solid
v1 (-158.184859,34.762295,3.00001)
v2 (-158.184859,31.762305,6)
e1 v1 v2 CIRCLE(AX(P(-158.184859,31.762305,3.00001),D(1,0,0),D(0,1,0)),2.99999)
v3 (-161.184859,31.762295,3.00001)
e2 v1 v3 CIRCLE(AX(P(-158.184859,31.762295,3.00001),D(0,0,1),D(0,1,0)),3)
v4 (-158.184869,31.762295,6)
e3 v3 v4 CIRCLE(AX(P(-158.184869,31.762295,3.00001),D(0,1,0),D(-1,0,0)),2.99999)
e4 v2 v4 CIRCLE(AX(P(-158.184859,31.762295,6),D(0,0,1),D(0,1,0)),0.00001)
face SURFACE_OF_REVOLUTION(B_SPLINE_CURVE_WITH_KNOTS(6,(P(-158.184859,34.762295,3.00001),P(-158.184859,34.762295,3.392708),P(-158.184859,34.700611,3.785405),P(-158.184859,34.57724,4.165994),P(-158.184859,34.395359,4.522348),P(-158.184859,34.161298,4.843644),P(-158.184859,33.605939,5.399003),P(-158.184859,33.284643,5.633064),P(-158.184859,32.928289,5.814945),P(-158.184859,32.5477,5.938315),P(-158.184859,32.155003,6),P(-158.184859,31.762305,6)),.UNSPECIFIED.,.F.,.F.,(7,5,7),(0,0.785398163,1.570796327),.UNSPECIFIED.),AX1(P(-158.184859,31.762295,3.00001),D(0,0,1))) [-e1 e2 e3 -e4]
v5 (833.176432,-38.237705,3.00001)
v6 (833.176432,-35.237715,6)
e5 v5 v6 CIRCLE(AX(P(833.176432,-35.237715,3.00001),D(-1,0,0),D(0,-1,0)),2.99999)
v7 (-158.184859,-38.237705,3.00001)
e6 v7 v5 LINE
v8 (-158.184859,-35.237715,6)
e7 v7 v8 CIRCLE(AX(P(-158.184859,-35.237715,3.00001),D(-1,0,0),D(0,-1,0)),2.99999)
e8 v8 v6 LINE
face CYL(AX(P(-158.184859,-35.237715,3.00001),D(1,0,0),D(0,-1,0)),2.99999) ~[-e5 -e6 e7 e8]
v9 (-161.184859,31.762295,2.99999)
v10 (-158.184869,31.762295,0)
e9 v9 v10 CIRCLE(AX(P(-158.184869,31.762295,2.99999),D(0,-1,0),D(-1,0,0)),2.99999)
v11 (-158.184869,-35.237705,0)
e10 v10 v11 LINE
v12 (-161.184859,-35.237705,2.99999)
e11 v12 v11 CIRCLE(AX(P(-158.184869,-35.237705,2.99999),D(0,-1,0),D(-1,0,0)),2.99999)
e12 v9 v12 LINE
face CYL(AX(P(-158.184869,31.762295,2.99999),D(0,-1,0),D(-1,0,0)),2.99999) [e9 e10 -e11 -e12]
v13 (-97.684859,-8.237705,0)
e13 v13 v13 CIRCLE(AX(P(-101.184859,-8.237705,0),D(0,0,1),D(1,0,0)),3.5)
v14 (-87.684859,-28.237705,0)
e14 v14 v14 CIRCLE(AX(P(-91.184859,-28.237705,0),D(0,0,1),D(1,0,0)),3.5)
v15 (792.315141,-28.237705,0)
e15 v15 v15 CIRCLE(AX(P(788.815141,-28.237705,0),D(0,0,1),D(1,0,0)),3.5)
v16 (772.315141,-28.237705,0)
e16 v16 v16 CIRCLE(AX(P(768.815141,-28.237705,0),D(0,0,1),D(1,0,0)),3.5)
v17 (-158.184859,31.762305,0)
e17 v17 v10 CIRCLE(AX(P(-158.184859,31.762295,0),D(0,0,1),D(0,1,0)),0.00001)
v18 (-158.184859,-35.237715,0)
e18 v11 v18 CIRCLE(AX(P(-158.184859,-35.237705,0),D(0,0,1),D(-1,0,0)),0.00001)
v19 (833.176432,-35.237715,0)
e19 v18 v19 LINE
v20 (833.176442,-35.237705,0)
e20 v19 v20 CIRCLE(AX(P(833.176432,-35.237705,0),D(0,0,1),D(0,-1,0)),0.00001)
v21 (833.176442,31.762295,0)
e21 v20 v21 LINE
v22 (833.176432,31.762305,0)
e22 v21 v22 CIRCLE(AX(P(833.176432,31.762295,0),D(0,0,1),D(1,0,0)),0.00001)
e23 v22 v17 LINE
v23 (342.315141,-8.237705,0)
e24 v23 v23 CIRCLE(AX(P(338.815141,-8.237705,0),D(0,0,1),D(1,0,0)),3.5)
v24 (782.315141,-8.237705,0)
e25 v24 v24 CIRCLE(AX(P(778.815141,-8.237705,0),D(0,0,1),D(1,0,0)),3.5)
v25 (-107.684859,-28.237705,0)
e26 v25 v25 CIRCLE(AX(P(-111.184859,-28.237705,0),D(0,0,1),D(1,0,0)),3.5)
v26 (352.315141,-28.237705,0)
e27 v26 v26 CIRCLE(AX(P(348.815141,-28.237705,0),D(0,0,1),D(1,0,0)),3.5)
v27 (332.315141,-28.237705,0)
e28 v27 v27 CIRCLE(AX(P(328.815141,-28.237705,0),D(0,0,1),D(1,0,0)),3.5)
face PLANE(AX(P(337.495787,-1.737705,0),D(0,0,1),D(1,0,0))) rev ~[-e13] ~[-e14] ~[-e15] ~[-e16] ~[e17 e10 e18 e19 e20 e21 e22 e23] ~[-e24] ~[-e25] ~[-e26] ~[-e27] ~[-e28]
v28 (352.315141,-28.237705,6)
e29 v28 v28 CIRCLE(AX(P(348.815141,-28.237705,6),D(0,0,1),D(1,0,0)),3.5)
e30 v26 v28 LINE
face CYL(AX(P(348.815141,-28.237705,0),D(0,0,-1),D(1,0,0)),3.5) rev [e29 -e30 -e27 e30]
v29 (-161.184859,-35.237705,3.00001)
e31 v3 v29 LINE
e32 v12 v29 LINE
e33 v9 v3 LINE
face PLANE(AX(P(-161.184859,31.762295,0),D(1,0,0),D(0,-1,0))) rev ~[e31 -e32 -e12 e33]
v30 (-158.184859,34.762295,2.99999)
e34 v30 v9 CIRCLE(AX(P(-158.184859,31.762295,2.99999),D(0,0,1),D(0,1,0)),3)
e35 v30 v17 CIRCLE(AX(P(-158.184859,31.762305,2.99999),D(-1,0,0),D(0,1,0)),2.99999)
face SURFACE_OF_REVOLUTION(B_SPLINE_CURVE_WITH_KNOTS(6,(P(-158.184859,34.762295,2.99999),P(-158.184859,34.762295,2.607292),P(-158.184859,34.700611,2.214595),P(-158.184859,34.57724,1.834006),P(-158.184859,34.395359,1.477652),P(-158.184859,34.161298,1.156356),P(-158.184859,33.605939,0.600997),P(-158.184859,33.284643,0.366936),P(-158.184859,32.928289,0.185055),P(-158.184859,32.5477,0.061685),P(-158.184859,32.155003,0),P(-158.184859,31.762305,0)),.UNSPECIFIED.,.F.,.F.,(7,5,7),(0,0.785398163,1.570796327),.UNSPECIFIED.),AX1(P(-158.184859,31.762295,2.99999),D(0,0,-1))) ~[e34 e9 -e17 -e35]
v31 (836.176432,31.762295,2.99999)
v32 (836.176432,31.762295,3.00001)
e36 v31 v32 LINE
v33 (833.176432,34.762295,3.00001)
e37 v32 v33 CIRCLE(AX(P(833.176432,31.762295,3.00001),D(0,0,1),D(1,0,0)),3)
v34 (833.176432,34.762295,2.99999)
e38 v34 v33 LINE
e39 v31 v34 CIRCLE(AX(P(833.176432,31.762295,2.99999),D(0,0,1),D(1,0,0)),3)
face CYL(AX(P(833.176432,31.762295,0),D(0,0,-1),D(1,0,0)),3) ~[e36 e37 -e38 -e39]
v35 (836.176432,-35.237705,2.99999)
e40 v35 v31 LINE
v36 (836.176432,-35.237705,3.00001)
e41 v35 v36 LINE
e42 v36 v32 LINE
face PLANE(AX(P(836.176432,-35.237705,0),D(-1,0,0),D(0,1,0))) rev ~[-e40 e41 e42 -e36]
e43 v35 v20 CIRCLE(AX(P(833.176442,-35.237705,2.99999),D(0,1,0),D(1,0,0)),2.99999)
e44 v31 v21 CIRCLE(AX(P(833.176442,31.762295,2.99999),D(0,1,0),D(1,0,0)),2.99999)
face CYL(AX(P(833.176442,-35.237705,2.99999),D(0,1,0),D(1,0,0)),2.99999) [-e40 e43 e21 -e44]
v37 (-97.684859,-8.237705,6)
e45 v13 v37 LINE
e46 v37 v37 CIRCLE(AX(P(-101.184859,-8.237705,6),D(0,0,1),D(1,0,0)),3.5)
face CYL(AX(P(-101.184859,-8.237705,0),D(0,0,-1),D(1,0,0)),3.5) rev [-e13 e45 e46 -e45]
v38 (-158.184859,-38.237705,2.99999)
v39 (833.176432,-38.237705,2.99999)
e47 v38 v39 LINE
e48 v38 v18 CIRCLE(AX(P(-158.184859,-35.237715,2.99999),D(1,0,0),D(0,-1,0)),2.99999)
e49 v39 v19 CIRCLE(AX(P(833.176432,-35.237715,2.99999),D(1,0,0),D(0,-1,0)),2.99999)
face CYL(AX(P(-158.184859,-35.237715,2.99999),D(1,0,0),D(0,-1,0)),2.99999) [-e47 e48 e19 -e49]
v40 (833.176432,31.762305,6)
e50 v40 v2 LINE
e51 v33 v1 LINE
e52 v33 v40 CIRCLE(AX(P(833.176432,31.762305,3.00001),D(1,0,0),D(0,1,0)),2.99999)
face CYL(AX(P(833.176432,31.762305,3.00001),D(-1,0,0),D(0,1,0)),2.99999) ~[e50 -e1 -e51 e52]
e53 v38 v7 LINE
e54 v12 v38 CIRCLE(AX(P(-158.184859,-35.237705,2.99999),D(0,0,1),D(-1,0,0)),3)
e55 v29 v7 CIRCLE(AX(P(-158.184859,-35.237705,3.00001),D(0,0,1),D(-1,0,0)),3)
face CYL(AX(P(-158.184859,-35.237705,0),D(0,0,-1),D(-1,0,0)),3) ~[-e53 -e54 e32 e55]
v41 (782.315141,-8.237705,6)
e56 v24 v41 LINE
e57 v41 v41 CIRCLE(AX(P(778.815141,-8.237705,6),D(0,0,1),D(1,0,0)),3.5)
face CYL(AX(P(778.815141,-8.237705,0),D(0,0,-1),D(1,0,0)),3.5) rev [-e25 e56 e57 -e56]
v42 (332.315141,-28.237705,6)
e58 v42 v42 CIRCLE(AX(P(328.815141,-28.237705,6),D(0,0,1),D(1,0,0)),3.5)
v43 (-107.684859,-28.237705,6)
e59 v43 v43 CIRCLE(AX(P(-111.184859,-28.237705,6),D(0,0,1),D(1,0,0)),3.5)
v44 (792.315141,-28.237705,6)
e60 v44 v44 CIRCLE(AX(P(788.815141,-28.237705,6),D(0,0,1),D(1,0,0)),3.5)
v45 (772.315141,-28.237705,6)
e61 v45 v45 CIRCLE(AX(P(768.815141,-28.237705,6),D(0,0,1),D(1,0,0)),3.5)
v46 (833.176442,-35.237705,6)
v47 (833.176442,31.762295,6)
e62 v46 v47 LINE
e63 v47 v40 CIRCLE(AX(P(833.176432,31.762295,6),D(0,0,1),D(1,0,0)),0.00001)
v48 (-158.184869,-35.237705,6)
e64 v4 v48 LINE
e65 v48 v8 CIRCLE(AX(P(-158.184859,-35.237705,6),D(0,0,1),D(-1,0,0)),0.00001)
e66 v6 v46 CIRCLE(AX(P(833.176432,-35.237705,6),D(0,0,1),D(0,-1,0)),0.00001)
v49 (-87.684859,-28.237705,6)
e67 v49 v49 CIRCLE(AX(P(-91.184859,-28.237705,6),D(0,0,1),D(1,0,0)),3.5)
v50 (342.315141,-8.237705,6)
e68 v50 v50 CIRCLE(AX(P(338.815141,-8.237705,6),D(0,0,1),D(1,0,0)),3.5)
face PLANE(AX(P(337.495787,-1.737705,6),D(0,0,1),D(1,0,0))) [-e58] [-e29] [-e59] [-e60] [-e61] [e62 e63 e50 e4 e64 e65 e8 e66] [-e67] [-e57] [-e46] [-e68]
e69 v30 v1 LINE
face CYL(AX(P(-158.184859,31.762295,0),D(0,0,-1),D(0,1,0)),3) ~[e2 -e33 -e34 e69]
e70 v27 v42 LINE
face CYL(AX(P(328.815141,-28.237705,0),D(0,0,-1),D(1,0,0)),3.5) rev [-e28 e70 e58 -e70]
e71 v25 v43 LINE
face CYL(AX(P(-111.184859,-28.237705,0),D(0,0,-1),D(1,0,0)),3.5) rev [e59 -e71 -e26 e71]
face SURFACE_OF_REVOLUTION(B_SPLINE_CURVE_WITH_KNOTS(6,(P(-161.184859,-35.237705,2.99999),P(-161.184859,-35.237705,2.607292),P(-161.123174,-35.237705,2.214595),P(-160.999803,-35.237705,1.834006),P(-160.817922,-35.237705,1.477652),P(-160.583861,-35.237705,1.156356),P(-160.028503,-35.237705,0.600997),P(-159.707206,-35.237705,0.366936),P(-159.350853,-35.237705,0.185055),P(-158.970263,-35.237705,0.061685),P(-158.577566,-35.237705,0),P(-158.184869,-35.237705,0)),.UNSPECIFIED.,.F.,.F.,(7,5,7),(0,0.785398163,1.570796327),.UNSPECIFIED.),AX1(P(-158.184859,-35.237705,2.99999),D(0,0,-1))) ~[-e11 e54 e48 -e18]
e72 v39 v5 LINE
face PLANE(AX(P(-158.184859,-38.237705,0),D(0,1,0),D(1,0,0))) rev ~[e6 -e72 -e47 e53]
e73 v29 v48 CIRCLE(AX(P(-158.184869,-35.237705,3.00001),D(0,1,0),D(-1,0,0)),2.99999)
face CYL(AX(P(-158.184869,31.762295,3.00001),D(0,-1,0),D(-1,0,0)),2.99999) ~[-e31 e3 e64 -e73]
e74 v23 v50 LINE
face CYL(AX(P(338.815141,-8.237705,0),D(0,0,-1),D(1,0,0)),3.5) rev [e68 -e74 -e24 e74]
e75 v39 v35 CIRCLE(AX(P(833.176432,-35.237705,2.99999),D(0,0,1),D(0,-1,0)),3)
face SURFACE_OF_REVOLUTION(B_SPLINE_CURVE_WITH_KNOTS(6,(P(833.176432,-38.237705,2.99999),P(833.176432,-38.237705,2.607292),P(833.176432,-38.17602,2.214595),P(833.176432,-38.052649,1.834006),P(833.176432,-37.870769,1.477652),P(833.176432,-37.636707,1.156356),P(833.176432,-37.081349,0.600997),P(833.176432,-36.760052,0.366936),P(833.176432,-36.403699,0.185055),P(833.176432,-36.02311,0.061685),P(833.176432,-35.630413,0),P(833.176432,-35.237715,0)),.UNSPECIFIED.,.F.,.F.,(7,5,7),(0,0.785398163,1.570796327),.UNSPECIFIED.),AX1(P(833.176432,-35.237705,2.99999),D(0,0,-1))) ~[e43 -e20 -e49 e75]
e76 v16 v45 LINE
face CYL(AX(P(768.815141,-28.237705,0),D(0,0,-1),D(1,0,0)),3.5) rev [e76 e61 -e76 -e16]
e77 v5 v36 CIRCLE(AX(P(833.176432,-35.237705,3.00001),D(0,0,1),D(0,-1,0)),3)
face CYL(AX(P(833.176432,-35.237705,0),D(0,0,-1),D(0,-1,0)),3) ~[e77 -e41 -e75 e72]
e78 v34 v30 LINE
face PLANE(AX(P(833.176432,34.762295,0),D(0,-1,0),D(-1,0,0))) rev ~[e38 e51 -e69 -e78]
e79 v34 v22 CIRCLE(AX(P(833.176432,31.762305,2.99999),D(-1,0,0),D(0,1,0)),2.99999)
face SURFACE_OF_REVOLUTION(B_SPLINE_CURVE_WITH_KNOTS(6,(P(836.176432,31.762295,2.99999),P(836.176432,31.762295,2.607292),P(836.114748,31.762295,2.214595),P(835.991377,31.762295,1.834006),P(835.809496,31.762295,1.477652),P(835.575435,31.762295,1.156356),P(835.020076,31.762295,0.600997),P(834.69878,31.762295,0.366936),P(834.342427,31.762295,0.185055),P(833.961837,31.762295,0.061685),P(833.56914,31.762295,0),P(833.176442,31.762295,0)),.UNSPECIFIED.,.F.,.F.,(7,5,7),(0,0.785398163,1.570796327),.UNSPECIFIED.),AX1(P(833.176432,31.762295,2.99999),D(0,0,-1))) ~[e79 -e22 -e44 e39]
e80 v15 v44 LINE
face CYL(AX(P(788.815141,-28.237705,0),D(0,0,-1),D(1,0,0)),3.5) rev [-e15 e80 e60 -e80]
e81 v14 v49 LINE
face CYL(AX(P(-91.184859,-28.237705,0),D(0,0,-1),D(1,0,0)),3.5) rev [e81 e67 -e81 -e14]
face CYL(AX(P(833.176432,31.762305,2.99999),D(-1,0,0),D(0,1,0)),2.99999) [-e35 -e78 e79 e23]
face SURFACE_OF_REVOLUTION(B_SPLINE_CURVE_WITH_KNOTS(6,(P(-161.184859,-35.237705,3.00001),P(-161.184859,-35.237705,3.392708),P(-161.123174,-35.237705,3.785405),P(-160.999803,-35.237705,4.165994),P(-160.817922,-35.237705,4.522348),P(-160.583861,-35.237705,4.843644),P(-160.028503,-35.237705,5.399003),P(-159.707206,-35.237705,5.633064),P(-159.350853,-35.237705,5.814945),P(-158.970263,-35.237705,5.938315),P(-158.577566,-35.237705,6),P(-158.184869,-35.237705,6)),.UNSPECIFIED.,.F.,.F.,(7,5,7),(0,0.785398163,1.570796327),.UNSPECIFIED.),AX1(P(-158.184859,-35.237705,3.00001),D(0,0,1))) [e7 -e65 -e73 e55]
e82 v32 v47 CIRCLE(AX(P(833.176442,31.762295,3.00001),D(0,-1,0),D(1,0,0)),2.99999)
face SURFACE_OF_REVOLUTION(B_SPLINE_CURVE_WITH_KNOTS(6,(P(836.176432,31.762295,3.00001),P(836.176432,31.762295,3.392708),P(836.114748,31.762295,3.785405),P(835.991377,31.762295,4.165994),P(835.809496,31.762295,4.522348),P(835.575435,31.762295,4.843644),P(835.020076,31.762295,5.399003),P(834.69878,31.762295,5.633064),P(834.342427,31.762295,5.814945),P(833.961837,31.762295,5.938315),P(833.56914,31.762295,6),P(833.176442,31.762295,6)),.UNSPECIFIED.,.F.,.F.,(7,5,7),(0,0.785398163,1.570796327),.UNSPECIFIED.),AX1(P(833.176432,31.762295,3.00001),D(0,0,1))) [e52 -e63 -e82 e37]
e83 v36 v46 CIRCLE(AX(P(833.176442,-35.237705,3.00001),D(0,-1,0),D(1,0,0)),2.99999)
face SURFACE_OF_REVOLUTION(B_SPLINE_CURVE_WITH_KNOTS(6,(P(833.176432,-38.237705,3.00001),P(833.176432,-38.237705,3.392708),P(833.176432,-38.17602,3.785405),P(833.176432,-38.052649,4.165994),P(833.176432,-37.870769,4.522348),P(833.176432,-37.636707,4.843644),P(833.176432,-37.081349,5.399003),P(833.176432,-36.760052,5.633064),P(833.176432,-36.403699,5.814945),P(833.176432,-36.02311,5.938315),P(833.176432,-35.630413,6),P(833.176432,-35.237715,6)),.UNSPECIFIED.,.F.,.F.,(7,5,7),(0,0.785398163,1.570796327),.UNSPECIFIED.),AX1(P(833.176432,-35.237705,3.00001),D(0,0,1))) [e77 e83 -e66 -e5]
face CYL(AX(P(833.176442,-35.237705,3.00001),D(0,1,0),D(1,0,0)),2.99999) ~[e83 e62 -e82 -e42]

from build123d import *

# Parameters (mm, degrees)
F0_R     = 3.5
F1_DEPTH = 6
F2_R     = 2.99999


# Not quite as in the source:
# - a fillet or chamfer is up to 0.001 mm smaller than in the source, because OpenCascade refuses the exact size


with BuildPart() as f1:
    # F0 (on Top) → F1 (new body)
    with BuildSketch(Plane.XY):
        with BuildLine():
            Line((833.1764324449, 34.7622951977), (-158.1848585529, 34.7622951977))
            ThreePointArc((-158.1848585529, 34.7622951977), (-160.3061788964, 33.8836155413), (-161.1848585529, 31.7622951977))
            Line((-161.1848585529, 31.7622951977), (-161.1848585529, -35.2377048023))
            ThreePointArc((-161.1848585529, -35.2377048023), (-160.3061788964, -37.3590251459), (-158.1848585529, -38.2377048023))
            Line((-158.1848585529, -38.2377048023), (833.1764324449, -38.2377048023))
            ThreePointArc((833.1764324449, -38.2377048023), (835.2977527885, -37.3590251459), (836.1764324449, -35.2377048023))
            Line((836.1764324449, -35.2377048023), (836.1764324449, 31.7622951977))
            ThreePointArc((836.1764324449, 31.7622951977), (835.2977527885, 33.8836155413), (833.1764324449, 34.7622951977))
        make_face()
        with Locations((-111.1848585529, -28.2377048023)):
            Circle(F0_R, mode=Mode.SUBTRACT)
        with Locations((-91.1848585529, -28.2377048023)):
            Circle(F0_R, mode=Mode.SUBTRACT)
        with Locations((328.8151414471, -28.2377048023)):
            Circle(F0_R, mode=Mode.SUBTRACT)
        with Locations((-101.1848585529, -8.2377048023)):
            Circle(F0_R, mode=Mode.SUBTRACT)
        with Locations((348.8151414471, -28.2377048023)):
            Circle(F0_R, mode=Mode.SUBTRACT)
        with Locations((768.8151414471, -28.2377048023)):
            Circle(F0_R, mode=Mode.SUBTRACT)
        with Locations((788.8151414471, -28.2377048023)):
            Circle(F0_R, mode=Mode.SUBTRACT)
        with Locations((338.8151414471, -8.2377048023)):
            Circle(F0_R, mode=Mode.SUBTRACT)
        with Locations((778.8151414471, -8.2377048023)):
            Circle(F0_R, mode=Mode.SUBTRACT)
    extrude(amount=F1_DEPTH)

    # F2 (radius 3 in the source; OpenCascade refuses exactly that, so slightly less here)
    f2_edges = [f1.edges().sort_by_distance(p)[0] for p in [
        (836.176432, -35.237705, 3),
        (836.176432, 31.762295, 3),
        (836.176432, -1.737705, 0),
        (836.176432, -1.737705, 6),
    ]]
    fillet(f2_edges, radius=F2_R)


solid = f1.part
